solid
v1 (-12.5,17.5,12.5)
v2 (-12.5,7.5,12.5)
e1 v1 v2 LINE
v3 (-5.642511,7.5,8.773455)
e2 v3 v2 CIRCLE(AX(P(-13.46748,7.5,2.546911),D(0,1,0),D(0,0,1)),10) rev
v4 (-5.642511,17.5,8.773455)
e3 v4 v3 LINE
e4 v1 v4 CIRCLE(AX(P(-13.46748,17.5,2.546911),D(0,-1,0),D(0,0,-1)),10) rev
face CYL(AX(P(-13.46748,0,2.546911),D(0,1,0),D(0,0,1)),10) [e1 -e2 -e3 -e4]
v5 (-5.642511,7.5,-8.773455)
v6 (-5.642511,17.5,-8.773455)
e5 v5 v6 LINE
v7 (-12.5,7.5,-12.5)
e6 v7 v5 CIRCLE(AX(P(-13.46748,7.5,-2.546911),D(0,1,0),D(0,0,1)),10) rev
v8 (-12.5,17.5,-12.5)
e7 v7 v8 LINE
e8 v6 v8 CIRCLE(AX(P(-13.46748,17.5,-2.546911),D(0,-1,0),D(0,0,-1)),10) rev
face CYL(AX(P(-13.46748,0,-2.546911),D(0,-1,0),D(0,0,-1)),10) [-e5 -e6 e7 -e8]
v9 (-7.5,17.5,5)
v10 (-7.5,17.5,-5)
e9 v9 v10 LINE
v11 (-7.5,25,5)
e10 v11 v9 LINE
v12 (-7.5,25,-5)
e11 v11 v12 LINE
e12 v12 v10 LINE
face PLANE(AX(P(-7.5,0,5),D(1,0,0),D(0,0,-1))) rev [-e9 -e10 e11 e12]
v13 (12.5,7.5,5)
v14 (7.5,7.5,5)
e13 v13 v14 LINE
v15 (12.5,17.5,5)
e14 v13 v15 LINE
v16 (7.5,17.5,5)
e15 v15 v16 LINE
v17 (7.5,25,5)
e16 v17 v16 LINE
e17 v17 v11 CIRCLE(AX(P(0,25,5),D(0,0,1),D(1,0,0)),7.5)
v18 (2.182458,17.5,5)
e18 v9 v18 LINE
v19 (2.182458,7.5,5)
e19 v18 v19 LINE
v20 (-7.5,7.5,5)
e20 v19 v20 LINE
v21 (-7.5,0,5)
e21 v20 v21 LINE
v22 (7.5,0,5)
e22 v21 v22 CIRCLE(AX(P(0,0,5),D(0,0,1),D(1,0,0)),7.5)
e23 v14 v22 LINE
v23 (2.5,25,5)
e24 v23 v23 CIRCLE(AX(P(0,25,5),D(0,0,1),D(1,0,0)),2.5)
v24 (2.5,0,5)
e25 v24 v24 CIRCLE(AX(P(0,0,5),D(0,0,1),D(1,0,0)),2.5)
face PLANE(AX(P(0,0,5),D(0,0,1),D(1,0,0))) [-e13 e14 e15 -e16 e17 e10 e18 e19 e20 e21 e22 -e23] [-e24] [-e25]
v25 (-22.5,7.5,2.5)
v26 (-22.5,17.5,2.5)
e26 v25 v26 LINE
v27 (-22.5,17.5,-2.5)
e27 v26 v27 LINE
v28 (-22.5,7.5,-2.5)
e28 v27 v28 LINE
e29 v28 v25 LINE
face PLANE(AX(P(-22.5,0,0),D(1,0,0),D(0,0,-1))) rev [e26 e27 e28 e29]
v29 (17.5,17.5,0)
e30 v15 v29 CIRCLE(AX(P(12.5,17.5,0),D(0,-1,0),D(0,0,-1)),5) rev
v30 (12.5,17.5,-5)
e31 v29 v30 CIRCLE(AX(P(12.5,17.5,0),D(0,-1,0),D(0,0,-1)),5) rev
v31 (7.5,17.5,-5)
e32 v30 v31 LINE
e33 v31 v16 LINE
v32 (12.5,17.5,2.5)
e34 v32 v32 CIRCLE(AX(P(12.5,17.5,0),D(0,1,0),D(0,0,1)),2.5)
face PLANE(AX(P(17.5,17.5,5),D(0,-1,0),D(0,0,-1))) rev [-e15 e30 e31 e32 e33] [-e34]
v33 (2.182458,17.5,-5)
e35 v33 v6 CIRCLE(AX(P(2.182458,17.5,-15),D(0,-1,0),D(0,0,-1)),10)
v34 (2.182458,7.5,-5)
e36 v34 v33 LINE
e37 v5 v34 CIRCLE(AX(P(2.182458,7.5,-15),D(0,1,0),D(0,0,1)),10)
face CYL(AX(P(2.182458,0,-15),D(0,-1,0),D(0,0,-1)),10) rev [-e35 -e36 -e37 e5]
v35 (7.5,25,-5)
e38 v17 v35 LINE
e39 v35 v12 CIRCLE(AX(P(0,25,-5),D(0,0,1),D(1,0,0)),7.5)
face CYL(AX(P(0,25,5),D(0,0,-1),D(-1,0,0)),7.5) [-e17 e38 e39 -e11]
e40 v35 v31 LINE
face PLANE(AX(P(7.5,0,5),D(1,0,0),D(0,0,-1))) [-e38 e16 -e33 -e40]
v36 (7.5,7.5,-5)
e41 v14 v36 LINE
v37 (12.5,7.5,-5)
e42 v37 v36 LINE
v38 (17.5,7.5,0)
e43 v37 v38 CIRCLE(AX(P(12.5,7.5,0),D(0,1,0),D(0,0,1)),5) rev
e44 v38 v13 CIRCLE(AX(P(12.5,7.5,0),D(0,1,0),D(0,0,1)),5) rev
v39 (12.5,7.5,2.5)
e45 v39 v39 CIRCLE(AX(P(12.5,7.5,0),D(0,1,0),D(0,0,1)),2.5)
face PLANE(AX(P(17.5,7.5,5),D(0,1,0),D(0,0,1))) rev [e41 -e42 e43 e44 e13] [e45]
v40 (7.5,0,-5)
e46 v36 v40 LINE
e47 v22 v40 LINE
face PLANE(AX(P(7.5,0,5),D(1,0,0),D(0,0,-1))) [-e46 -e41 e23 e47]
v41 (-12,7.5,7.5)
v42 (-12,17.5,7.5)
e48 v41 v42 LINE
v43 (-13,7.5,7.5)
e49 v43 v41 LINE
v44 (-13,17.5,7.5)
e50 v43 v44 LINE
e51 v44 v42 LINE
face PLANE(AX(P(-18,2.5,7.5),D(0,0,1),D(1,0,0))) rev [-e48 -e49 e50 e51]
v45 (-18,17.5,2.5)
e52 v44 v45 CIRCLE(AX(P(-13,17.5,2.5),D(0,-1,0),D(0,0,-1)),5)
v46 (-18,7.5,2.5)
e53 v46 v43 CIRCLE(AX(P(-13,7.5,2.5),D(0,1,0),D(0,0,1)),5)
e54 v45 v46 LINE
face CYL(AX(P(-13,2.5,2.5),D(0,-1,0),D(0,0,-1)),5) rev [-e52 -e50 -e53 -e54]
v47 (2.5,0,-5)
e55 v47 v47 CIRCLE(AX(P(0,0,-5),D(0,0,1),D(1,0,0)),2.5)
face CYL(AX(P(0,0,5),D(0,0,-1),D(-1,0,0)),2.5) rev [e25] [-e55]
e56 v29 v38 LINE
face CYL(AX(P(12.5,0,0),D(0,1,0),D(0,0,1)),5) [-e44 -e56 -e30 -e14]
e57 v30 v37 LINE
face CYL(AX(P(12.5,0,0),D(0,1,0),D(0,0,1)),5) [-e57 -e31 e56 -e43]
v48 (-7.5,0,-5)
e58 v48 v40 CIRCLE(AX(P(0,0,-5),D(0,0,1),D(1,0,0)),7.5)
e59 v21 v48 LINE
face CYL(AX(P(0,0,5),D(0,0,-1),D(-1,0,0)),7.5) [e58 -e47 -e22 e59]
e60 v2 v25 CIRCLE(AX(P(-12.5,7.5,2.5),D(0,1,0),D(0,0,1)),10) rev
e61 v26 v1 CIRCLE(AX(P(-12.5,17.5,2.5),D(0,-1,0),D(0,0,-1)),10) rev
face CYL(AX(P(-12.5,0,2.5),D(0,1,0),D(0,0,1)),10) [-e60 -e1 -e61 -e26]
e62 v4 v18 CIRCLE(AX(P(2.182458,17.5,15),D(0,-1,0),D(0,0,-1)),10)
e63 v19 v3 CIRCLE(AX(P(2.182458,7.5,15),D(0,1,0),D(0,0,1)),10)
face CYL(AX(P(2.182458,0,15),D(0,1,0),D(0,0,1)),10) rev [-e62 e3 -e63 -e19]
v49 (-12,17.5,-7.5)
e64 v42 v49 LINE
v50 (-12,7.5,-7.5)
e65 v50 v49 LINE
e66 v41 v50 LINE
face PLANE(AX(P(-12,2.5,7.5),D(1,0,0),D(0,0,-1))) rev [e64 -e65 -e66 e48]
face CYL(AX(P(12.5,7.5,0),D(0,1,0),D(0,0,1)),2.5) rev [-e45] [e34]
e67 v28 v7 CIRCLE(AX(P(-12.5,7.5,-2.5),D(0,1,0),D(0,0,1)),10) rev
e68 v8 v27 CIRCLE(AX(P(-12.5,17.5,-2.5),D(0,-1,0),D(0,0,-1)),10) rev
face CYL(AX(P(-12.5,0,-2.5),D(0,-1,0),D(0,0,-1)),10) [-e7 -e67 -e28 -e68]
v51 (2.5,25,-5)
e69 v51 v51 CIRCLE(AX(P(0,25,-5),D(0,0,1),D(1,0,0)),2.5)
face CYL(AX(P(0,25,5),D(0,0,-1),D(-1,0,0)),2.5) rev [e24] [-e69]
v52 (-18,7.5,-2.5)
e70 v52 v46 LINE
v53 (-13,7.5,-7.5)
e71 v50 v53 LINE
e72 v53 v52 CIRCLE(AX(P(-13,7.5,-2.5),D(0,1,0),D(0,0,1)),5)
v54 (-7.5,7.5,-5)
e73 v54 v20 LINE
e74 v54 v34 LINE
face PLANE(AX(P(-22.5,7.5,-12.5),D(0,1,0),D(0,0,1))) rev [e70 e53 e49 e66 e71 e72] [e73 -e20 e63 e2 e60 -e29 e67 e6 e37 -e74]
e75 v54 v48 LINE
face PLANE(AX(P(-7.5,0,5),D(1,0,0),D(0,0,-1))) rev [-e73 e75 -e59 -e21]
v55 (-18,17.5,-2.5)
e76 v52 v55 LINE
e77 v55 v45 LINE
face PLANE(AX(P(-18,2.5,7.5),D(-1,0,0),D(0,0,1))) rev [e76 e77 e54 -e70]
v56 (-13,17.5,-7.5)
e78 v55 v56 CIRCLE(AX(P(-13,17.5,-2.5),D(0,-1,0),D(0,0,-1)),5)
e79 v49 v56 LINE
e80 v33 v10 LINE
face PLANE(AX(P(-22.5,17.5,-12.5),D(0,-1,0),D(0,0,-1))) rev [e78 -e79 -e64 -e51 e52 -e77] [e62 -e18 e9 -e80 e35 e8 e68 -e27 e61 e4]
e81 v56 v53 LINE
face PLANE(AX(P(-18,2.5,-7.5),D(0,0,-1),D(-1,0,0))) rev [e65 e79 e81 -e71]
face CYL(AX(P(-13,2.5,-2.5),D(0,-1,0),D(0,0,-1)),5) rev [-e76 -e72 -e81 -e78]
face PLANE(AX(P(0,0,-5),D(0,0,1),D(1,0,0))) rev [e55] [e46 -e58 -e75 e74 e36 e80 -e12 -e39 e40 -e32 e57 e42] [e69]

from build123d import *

# Parameters (mm, degrees)
SKETCH1_R           = 2.5
BOSS_EXTRUDE1_DEPTH = 5
SKETCH2_W           = 25
SKETCH2_H           = 10
BOSS_EXTRUDE2_DEPTH = 15
SKETCH3_W           = 6
SKETCH3_H           = 15
CUT_EXTRUDE1_DEPTH  = 15
FILLET1_R           = 10
FILLET2_R           = 10
FILLET3_R           = 5
SKETCH4_W           = 10
SKETCH4_H           = 10
BOSS_EXTRUDE3_DEPTH = 10
FILLET4_R           = 5
SKETCH5_R           = 2.5
CUT_EXTRUDE2_DEPTH  = 10


# Some blends are built 0.0001 mm under size
with BuildPart() as part:
    # Sketch1 → Boss-Extrude1 (new, symmetric)
    with BuildSketch(Plane.XY):
        with BuildLine():
            ThreePointArc((-7.5, 0), (0, -7.5), (7.5, 0))
            Line((7.5, 0), (7.5, 25))
            ThreePointArc((7.5, 25), (0, 32.5), (-7.5, 25))
            Line((-7.5, 25), (-7.5, 0))
        make_face()
        Circle(SKETCH1_R, mode=Mode.SUBTRACT)
        with Locations((0, 25)):
            Circle(SKETCH1_R, mode=Mode.SUBTRACT)
    extrude(amount=BOSS_EXTRUDE1_DEPTH, both=True)

    # Sketch2 → Boss-Extrude2 (add)
    with BuildSketch(Plane.ZY.offset(7.5)):
        with Locations((0, 12.5)):
            Rectangle(SKETCH2_W, SKETCH2_H)
    extrude(amount=BOSS_EXTRUDE2_DEPTH)

    # Sketch3 → Cut-Extrude1 (cut)
    with BuildSketch(Plane(origin=(0, 17.5, 0), x_dir=(1, 0, 0), z_dir=(0, 1, 0))):
        with Locations((-15, 0)):
            Rectangle(SKETCH3_W, SKETCH3_H)
    extrude(amount=-CUT_EXTRUDE1_DEPTH, mode=Mode.SUBTRACT)

    # Fillet1
    # the kernel refuses this fillet: 10 mm, written as the material it adds along each edge
    with BuildSketch(Plane(origin=(-7.5, 17.5, -5), x_dir=(1, 0, 0), z_dir=(0, -1, 0))) as fillet1_piece_1:
        with BuildLine():
            CenterArc((9.682458366, -10), FILLET1_R, 90, 75.522487814)
            Line((0, -7.5), (0, 0))
            Line((0, 0), (9.682458366, 0))
        make_face()
    extrude(amount=10)
    with BuildSketch(Plane(origin=(-7.5, 17.5, 5), x_dir=(1, 0, 0), z_dir=(0, -1, 0))) as fillet1_piece_2:
        with BuildLine():
            CenterArc((9.682458366, 10), FILLET1_R, 194.477512186, 75.522487814)
            Line((0, 7.5), (0, 0))
            Line((0, 0), (9.682458366, 0))
        make_face()
    extrude(amount=10)
    # the kernel refuses this fillet: 10 mm, written as the material it takes off along each edge
    with BuildSketch(Plane(origin=(-22.5, -17.5, 12.5), x_dir=(1, 0, 0), z_dir=(0, 1, 0)), Plane(origin=(-22.5, 42.5, -12.5), x_dir=(1, 0, 0), z_dir=(0, -1, 0))) as fillet1_2_piece_1:
        with BuildLine():
            CenterArc((FILLET1_R, FILLET1_R), FILLET1_R, 180, 90)
            Line((0, FILLET1_R), (0, 0))
            Line((0, 0), (FILLET1_R, 0))
        make_face()
    extrude(amount=60, mode=Mode.SUBTRACT)

    # Fillet2
    # the kernel refuses this fillet: 10 mm, written as the material it takes off along each edge
    with BuildSketch(Plane(origin=(-7.5, 30, -12.5), x_dir=(-1.0, 0, 1.525535253676709e-12), z_dir=(0, -1, 0))) as fillet2_piece_1:
        with BuildLine():
            CenterArc((5.967480043, -9.953089087), FILLET2_R, 95.55193659, 45.937826444)
            Line((-1.857489161, -3.726544543), (-2.013988545, -3.602013652))
            ThreePointArc((-2.013988545, -3.602013652), (-0.911634188, -1.871800915), (-0.193649167, 0.05))
            Line((-0.193649167, 0.05), (0, 0.2))
            ThreePointArc((0, 0.2), (2.5, 0.2), (4.980650399, 0.199061782))
            Line((4.980650399, 0.199061782), (5, 0))
        make_face()
    extrude(amount=35, mode=Mode.SUBTRACT)
    with BuildSketch(Plane(origin=(-7.5, -5, 12.5), x_dir=(0.4461021341851978, 0, -0.8949820589684531), z_dir=(0, 1, 0))) as fillet2_piece_2:
        with BuildLine():
            CenterArc((6.245730581, 9.780881859), FILLET2_R, 212.045811166, 45.937826444)
            Line((-2.230510671, 4.474910295), (-2.400035496, 4.368790864))
            ThreePointArc((-2.400035496, 4.368790864), (-1.294251747, 2.148234721), (-0.178996412, -0.089220427))
            Line((-0.178996412, -0.089220427), (0.041638204, -0.195617637))
            ThreePointArc((0.041638204, -0.195617637), (2.081910194, 0.019118141), (4.122182183, -0.195617637))
            Line((4.122182183, -0.195617637), (4.163820387, 0))
        make_face()
    extrude(amount=35, mode=Mode.SUBTRACT)

    # Fillet3
    fillet3_edges = [part.edges().sort_by_distance(p)[0] for p in [
        (-18, 12.5, 7.5),
        (-18, 12.5, -7.5),
    ]]
    fillet(fillet3_edges, radius=FILLET3_R)

    # Sketch4 → Boss-Extrude3 (add)
    with BuildSketch(Plane(origin=(7.5, 0, 0), x_dir=(0, 0, -1), z_dir=(1, 0, 0))):
        with Locations((0, 12.5)):
            Rectangle(SKETCH4_W, SKETCH4_H)
    extrude(amount=BOSS_EXTRUDE3_DEPTH)

    # Fillet4
    fillet4_edges = [part.edges().sort_by_distance(p)[0] for p in [
        (17.5, 12.5, -5),
        (17.5, 12.5, 5),
    ]]
    fillet(fillet4_edges, radius=FILLET4_R - 0.0001)  # a hair under: the kernel refuses the full size

    # Sketch5 → Cut-Extrude2 (cut)
    with BuildSketch(Plane(origin=(0, 17.5, 0), x_dir=(1, 0, 0), z_dir=(0, 1, 0))):
        with Locations(Location((12.5, 0, 0), (0, 0, 270))):
            Circle(SKETCH5_R)
    extrude(amount=-CUT_EXTRUDE2_DEPTH, mode=Mode.SUBTRACT)


solid = part.part
